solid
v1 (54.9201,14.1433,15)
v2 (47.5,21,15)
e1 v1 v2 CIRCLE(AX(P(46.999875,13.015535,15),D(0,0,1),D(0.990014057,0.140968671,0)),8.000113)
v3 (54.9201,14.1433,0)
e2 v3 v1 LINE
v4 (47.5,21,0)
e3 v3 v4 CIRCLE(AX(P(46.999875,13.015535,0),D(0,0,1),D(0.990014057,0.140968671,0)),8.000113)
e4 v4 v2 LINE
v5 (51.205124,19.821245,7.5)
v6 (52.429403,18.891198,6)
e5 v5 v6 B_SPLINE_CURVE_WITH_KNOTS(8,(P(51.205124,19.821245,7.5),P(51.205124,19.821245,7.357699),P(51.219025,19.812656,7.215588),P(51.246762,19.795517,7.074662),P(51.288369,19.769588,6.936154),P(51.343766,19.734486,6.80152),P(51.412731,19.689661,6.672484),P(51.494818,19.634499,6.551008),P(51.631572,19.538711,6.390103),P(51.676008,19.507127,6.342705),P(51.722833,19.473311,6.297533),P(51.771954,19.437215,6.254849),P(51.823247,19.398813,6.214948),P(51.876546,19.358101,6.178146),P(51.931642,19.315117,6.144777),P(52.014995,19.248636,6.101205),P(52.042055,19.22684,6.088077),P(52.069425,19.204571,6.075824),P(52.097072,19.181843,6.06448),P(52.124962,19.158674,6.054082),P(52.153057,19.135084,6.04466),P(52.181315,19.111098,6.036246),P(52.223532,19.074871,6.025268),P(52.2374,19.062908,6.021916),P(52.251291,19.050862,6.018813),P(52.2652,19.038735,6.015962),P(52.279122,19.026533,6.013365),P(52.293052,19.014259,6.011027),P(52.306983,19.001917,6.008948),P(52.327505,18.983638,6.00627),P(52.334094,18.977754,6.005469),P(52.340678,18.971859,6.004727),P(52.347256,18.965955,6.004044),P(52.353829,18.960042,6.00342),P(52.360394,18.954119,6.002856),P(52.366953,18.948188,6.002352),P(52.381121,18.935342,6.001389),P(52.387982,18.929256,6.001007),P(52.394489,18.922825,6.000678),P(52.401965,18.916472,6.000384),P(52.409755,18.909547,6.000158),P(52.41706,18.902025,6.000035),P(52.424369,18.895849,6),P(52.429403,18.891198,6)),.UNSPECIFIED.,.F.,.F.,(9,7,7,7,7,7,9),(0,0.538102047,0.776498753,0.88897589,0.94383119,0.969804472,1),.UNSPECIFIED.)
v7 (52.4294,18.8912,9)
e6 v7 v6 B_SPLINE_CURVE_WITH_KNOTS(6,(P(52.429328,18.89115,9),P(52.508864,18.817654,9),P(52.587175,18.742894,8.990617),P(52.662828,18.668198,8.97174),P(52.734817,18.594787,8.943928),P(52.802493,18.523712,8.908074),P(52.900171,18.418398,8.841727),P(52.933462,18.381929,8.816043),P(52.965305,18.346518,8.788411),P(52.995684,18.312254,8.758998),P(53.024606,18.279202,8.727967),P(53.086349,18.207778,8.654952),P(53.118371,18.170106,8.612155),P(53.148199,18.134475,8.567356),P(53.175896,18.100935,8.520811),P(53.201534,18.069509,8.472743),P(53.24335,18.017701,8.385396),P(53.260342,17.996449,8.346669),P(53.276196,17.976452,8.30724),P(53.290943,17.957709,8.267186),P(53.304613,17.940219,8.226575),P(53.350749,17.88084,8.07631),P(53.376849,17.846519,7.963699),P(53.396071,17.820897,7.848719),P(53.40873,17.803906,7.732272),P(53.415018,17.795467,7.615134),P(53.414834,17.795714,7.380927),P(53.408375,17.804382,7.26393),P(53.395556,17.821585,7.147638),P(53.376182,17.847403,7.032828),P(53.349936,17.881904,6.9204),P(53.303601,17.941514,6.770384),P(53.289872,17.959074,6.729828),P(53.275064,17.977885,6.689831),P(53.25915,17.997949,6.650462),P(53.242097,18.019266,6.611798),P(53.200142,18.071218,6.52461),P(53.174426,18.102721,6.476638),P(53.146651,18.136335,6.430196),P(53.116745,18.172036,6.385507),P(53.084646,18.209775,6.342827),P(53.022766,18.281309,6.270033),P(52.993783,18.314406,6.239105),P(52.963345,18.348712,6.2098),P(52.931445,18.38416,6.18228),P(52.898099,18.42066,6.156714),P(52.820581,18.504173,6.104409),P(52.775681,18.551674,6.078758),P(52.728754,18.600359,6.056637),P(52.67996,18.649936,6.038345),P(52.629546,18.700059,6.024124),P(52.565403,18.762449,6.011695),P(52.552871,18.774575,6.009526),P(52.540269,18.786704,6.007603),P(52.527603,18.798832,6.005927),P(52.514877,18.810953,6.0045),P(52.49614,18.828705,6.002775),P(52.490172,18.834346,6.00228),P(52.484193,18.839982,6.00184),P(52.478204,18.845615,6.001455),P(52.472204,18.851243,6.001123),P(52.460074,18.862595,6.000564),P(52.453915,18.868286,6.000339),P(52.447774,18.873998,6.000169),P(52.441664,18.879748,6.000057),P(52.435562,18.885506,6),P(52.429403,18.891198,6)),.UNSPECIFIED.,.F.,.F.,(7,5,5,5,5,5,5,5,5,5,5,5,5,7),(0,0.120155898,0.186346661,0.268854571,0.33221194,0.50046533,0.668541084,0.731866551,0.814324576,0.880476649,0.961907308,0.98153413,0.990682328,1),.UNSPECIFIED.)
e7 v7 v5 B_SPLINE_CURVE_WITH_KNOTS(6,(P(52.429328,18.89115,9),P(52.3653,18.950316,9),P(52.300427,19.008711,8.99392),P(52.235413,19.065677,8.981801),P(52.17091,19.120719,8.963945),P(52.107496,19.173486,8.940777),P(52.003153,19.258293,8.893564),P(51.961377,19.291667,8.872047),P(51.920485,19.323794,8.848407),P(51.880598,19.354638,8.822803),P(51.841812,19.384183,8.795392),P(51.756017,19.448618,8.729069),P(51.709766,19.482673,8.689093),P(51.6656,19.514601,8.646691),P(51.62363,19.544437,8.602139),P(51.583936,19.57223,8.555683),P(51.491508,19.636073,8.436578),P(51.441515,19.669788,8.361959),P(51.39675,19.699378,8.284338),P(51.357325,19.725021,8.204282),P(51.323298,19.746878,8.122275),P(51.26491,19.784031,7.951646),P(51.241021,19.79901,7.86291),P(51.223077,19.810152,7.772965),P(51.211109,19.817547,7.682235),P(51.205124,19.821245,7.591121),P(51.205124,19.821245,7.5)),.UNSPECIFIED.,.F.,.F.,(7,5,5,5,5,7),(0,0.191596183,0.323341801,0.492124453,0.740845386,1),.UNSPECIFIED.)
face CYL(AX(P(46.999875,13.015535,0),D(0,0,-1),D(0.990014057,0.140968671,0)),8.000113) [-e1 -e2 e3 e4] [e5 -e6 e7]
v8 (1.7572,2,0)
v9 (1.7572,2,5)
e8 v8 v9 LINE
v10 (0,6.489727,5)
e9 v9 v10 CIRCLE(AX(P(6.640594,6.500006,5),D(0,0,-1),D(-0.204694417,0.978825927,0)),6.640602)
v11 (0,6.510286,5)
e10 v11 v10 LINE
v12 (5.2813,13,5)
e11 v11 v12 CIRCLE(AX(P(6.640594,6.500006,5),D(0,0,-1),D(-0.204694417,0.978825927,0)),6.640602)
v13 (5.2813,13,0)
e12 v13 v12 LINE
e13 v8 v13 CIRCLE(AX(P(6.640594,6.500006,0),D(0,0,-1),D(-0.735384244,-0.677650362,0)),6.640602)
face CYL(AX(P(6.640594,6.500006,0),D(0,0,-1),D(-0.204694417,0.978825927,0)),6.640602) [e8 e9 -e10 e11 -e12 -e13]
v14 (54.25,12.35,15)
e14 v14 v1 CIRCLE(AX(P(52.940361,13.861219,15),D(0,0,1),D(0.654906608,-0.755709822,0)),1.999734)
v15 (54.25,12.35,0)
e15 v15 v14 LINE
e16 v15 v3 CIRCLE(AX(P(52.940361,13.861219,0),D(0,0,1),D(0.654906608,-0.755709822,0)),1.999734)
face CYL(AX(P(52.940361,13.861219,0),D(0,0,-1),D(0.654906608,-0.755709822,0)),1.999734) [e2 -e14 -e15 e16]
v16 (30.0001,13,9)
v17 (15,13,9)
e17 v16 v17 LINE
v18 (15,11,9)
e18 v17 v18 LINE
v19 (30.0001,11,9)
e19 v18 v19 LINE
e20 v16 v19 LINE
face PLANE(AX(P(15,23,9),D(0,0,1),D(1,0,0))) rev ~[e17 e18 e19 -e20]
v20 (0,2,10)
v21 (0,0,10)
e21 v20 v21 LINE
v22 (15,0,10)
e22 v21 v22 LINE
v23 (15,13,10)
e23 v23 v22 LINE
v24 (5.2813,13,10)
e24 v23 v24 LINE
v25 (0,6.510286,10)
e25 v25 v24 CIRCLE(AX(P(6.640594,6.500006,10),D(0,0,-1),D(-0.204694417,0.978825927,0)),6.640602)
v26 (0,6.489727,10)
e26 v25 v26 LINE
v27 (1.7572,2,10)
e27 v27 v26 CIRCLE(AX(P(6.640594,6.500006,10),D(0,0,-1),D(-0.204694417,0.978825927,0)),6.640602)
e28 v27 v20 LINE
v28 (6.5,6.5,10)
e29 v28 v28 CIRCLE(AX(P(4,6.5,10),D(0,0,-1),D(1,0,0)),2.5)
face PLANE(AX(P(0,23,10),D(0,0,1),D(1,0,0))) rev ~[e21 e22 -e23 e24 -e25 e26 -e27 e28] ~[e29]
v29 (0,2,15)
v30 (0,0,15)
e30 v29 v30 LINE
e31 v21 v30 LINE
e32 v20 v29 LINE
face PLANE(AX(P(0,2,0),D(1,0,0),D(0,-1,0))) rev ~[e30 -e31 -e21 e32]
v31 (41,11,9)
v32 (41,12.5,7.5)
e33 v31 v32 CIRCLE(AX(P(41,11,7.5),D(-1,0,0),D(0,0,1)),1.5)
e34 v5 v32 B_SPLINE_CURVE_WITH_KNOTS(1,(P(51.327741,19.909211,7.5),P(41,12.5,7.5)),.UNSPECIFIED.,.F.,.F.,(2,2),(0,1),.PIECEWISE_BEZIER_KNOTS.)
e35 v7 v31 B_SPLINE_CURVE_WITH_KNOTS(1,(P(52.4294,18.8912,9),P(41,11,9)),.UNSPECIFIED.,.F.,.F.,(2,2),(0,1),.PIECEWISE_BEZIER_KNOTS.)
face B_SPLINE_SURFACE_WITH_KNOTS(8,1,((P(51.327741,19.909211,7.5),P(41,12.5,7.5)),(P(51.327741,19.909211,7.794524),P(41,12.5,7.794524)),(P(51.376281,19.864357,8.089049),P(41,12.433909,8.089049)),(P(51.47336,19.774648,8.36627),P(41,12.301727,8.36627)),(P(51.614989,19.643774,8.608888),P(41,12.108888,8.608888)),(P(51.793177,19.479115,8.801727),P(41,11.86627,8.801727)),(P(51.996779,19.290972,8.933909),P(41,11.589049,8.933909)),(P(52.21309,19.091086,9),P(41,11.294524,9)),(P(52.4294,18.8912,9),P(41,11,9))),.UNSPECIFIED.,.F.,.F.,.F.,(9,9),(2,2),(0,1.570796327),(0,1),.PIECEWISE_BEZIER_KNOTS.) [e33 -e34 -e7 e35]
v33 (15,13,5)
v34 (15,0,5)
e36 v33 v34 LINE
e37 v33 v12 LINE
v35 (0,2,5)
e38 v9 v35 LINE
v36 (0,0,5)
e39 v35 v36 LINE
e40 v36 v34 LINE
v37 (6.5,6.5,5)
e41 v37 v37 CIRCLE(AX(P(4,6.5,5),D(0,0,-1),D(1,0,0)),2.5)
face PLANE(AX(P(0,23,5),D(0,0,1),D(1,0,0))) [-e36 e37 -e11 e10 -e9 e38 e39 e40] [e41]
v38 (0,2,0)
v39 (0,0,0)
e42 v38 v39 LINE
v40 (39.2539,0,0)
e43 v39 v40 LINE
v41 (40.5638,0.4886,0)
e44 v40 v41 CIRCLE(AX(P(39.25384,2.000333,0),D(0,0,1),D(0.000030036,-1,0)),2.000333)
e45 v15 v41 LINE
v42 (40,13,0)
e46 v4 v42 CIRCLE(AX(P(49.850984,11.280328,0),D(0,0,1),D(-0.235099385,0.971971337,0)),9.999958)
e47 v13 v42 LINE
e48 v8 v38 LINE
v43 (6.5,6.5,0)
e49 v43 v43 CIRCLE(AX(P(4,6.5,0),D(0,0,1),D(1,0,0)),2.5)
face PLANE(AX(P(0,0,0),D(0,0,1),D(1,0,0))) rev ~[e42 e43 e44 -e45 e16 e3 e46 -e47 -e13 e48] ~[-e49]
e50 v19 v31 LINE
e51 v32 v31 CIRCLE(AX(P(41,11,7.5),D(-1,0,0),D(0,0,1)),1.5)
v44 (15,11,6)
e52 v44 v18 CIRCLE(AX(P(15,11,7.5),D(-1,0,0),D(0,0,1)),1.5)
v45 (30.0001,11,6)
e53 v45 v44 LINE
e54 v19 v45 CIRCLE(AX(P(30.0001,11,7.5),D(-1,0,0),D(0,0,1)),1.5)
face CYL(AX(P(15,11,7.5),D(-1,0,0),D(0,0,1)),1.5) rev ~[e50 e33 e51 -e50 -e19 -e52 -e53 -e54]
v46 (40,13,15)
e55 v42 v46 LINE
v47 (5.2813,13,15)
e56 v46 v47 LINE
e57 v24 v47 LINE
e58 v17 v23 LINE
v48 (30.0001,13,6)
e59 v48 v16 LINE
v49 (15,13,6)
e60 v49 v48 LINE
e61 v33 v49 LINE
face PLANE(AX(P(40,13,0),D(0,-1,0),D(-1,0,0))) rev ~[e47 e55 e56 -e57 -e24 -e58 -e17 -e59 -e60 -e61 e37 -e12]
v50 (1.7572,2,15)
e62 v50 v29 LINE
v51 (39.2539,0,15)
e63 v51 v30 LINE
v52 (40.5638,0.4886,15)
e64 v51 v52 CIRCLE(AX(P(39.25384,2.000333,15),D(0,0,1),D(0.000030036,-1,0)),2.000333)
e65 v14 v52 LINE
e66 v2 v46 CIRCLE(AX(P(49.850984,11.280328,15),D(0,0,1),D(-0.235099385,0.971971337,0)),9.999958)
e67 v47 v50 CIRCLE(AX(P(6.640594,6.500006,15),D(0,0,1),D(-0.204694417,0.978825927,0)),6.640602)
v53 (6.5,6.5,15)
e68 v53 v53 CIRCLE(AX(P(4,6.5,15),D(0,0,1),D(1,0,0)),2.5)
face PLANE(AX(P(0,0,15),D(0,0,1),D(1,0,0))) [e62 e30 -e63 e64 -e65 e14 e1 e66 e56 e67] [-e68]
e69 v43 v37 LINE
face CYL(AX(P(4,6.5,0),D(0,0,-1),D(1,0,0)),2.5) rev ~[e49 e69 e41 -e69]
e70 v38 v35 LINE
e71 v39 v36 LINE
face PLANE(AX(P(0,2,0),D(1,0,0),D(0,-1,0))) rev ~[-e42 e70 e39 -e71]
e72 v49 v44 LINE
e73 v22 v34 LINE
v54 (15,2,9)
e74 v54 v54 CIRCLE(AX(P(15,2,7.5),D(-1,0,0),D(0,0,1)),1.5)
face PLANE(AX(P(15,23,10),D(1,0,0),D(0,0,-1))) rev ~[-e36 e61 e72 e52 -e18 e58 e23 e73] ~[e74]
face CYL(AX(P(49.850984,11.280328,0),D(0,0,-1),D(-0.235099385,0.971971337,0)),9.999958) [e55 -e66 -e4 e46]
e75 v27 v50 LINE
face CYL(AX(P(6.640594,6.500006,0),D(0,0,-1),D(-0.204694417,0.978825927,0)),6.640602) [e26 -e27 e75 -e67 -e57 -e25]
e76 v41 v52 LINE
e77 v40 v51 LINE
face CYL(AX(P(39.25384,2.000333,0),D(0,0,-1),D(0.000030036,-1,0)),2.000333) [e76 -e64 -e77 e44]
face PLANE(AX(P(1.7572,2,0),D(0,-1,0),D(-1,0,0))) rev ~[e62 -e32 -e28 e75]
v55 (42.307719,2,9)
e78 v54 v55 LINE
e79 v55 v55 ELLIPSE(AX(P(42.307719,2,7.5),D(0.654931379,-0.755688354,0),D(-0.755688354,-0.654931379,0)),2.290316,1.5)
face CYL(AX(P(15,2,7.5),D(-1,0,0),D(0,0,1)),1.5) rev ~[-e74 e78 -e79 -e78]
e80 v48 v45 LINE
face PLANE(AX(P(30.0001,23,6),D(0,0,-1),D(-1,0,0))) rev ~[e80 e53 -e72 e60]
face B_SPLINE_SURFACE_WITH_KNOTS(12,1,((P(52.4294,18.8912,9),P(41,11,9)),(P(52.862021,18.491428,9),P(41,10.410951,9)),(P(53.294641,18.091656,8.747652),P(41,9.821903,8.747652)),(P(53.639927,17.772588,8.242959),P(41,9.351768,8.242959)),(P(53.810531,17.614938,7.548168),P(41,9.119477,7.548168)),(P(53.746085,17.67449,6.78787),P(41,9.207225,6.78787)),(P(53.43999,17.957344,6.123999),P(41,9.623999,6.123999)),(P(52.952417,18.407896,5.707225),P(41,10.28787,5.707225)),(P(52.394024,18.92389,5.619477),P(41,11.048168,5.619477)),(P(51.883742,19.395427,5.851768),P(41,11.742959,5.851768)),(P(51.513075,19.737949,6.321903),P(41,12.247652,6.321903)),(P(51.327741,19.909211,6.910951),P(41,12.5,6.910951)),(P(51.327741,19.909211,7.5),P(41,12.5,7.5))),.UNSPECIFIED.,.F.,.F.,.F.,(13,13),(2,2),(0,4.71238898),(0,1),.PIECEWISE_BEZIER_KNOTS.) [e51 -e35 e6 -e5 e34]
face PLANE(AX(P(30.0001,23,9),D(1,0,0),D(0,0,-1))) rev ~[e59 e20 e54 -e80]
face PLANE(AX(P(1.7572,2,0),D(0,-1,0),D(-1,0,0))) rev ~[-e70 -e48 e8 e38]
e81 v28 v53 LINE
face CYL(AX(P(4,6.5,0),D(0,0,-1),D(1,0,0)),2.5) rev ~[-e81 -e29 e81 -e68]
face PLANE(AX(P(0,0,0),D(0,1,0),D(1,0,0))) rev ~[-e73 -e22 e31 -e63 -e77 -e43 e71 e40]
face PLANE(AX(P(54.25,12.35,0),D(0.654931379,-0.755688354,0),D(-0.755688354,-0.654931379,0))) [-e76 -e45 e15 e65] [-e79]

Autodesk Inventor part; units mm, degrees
ref_plane "YZ Plane" through (0, 0, 0) normal (1, 0, 0) x (0, 1, 0)
sketch "Sketch1" plane through (0, 0, 0) normal (0, 0, 1) x (1, 0, 0)
  line L0 (0, 0) -> (39.2539, 0)
  line L1 (40, 13) -> (0, 13)
  line L2 (0, 13) -> (0, 0)
  circle A0 centre (4, 6.5) radius 4
  circle A1 centre (4, 6.5) radius 2.5
  line L3 (8, 13) -> (8, 0)
  arc A2 (5.2813, 13) -> (1.7572, 2) centre (6.6406, 6.5) ccw
  line L4 (40, 0) -> (55, 0)
  line L5 (55, 0) -> (55, 13)
  arc A3 (47.5, 21) -> (40, 13) centre (49.851, 11.2803) ccw
  line L6 (54.25, 12.35) -> (40.5638, 0.4886)
  arc A4 (54.9201, 14.1433) -> (47.5, 21) centre (47, 13.0156) ccw
  arc A5 (39.2539, 0) -> (40.5638, 0.4886) centre (39.2539, 2) ccw
  arc A6 (54.25, 12.35) -> (54.9201, 14.1433) centre (52.9401, 13.8614) ccw
  line L7 (8, 0) -> (8, 2)
  line L8 (8, 2) -> (-2, 2)
  line L9 (-2, 2) -> (-2, 0)
  line L10 (-2, 0) -> (8, 0)
  point P0 (0, 6.5)
  point P1 (0, 2)
  dimension "d2" = 8
  dimension "d0" = 40
  dimension "d3" = 5
  dimension "d4" = 15
  dimension "d5" = 13
  dimension "d7" = 10
  dimension "d8" = 8
  dimension "d9" = 2
  dimension "d10" = 2
  dimension "d11" = 10
extrude "Extrusion1" add sketch "Sketch1" along normal blind 15 contours L2 L8 L3 L0 | L3 L1 A3 A4 A6 L6 A5 L0 | L8 A2 A0 L3 | A2 L1 L3 A0 | A0
ref_plane "Work Plane1" through (5.2813, 23, 0) normal (0, 1, 0) x (1, 0, 0)
sketch "Sketch2" plane through (5.2813, 23, 0) normal (0, 1, 0) x (1, 0, 0)
  line L0 (-5.2813, 0) -> (-5.2813, -15) projected
  line L1 (-5.2813, -7.5) -> (-5.2813, -5)
  line L2 (-5.2813, -7.5) -> (-5.2813, -10)
  line L3 (-5.2813, -5) -> (9.7187, -5)
  line L4 (-5.2813, -10) -> (9.7187, -10)
  line L5 (9.7187, -10) -> (9.7187, -5)
  line L6 (9.7187, -7.5) -> (9.7187, -6)
  line L7 (9.7187, -7.5) -> (9.7187, -9)
  line L8 (9.7187, -9) -> (24.7188, -9)
  line L9 (24.7188, -9) -> (24.7188, -6)
  line L10 (24.7188, -6) -> (9.7187, -6)
  dimension "d15" = 2.5
  dimension "d16" = 2.5
  dimension "d17" = 15
  dimension "d18" = 15
  dimension "d19" = 1.5
  dimension "d20" = 1.5
  dimension "d21" = 15
extrude "Extrusion2" cut sketch "Sketch2" against normal through all contours L3 L5 L4 L0
sketch "Sketch3" plane through (15, 0, 5) normal (-1, 0, 0) x (0, 0, 1)
  line L0 (0, 13) -> (5, 13) projected
  circle A0 centre (2.5, 11) radius 1.5
  circle A1 centre (2.5, 2) radius 1.5
  line L1 (5, 0) -> (0, 0) projected
  point P0 (-5, 0)
  point P1 (2.5, 0)
  dimension "d25" = 3
  dimension "d27" = 3
extrude "Extrusion3" cut sketch "Sketch3" against normal through all contours A1
extrude "Extrusion4" cut sketch "Sketch3" against normal blind 26 contours A0
extrude "Extrusion5" cut sketch "Sketch2" against normal blind 12 contours L10 L9 L8 L5
ref_plane "Work Plane2" through (52.4294, 18.8912, 0) normal (0.678674, 0.7344396, 0) x (-0.7344396, 0.678674, 0)
sketch "Sketch4" plane through (52.4294, 18.8912, 0) normal (0.678674, 0.7344396, 0) x (-0.7344396, 0.678674, 0)
  circle A0 centre (0, 7.5) radius 1.5
  point P0 (25.6853, 0)
  point P1 (5.0516, 15)
  point P2 (-5.0516, 15)
  dimension "d34" = 3
loft "Loft1" cut profiles "Sketch4" section 2 edges at (41, 11, 6)
properties part number "ProjEnAble_Finger"
